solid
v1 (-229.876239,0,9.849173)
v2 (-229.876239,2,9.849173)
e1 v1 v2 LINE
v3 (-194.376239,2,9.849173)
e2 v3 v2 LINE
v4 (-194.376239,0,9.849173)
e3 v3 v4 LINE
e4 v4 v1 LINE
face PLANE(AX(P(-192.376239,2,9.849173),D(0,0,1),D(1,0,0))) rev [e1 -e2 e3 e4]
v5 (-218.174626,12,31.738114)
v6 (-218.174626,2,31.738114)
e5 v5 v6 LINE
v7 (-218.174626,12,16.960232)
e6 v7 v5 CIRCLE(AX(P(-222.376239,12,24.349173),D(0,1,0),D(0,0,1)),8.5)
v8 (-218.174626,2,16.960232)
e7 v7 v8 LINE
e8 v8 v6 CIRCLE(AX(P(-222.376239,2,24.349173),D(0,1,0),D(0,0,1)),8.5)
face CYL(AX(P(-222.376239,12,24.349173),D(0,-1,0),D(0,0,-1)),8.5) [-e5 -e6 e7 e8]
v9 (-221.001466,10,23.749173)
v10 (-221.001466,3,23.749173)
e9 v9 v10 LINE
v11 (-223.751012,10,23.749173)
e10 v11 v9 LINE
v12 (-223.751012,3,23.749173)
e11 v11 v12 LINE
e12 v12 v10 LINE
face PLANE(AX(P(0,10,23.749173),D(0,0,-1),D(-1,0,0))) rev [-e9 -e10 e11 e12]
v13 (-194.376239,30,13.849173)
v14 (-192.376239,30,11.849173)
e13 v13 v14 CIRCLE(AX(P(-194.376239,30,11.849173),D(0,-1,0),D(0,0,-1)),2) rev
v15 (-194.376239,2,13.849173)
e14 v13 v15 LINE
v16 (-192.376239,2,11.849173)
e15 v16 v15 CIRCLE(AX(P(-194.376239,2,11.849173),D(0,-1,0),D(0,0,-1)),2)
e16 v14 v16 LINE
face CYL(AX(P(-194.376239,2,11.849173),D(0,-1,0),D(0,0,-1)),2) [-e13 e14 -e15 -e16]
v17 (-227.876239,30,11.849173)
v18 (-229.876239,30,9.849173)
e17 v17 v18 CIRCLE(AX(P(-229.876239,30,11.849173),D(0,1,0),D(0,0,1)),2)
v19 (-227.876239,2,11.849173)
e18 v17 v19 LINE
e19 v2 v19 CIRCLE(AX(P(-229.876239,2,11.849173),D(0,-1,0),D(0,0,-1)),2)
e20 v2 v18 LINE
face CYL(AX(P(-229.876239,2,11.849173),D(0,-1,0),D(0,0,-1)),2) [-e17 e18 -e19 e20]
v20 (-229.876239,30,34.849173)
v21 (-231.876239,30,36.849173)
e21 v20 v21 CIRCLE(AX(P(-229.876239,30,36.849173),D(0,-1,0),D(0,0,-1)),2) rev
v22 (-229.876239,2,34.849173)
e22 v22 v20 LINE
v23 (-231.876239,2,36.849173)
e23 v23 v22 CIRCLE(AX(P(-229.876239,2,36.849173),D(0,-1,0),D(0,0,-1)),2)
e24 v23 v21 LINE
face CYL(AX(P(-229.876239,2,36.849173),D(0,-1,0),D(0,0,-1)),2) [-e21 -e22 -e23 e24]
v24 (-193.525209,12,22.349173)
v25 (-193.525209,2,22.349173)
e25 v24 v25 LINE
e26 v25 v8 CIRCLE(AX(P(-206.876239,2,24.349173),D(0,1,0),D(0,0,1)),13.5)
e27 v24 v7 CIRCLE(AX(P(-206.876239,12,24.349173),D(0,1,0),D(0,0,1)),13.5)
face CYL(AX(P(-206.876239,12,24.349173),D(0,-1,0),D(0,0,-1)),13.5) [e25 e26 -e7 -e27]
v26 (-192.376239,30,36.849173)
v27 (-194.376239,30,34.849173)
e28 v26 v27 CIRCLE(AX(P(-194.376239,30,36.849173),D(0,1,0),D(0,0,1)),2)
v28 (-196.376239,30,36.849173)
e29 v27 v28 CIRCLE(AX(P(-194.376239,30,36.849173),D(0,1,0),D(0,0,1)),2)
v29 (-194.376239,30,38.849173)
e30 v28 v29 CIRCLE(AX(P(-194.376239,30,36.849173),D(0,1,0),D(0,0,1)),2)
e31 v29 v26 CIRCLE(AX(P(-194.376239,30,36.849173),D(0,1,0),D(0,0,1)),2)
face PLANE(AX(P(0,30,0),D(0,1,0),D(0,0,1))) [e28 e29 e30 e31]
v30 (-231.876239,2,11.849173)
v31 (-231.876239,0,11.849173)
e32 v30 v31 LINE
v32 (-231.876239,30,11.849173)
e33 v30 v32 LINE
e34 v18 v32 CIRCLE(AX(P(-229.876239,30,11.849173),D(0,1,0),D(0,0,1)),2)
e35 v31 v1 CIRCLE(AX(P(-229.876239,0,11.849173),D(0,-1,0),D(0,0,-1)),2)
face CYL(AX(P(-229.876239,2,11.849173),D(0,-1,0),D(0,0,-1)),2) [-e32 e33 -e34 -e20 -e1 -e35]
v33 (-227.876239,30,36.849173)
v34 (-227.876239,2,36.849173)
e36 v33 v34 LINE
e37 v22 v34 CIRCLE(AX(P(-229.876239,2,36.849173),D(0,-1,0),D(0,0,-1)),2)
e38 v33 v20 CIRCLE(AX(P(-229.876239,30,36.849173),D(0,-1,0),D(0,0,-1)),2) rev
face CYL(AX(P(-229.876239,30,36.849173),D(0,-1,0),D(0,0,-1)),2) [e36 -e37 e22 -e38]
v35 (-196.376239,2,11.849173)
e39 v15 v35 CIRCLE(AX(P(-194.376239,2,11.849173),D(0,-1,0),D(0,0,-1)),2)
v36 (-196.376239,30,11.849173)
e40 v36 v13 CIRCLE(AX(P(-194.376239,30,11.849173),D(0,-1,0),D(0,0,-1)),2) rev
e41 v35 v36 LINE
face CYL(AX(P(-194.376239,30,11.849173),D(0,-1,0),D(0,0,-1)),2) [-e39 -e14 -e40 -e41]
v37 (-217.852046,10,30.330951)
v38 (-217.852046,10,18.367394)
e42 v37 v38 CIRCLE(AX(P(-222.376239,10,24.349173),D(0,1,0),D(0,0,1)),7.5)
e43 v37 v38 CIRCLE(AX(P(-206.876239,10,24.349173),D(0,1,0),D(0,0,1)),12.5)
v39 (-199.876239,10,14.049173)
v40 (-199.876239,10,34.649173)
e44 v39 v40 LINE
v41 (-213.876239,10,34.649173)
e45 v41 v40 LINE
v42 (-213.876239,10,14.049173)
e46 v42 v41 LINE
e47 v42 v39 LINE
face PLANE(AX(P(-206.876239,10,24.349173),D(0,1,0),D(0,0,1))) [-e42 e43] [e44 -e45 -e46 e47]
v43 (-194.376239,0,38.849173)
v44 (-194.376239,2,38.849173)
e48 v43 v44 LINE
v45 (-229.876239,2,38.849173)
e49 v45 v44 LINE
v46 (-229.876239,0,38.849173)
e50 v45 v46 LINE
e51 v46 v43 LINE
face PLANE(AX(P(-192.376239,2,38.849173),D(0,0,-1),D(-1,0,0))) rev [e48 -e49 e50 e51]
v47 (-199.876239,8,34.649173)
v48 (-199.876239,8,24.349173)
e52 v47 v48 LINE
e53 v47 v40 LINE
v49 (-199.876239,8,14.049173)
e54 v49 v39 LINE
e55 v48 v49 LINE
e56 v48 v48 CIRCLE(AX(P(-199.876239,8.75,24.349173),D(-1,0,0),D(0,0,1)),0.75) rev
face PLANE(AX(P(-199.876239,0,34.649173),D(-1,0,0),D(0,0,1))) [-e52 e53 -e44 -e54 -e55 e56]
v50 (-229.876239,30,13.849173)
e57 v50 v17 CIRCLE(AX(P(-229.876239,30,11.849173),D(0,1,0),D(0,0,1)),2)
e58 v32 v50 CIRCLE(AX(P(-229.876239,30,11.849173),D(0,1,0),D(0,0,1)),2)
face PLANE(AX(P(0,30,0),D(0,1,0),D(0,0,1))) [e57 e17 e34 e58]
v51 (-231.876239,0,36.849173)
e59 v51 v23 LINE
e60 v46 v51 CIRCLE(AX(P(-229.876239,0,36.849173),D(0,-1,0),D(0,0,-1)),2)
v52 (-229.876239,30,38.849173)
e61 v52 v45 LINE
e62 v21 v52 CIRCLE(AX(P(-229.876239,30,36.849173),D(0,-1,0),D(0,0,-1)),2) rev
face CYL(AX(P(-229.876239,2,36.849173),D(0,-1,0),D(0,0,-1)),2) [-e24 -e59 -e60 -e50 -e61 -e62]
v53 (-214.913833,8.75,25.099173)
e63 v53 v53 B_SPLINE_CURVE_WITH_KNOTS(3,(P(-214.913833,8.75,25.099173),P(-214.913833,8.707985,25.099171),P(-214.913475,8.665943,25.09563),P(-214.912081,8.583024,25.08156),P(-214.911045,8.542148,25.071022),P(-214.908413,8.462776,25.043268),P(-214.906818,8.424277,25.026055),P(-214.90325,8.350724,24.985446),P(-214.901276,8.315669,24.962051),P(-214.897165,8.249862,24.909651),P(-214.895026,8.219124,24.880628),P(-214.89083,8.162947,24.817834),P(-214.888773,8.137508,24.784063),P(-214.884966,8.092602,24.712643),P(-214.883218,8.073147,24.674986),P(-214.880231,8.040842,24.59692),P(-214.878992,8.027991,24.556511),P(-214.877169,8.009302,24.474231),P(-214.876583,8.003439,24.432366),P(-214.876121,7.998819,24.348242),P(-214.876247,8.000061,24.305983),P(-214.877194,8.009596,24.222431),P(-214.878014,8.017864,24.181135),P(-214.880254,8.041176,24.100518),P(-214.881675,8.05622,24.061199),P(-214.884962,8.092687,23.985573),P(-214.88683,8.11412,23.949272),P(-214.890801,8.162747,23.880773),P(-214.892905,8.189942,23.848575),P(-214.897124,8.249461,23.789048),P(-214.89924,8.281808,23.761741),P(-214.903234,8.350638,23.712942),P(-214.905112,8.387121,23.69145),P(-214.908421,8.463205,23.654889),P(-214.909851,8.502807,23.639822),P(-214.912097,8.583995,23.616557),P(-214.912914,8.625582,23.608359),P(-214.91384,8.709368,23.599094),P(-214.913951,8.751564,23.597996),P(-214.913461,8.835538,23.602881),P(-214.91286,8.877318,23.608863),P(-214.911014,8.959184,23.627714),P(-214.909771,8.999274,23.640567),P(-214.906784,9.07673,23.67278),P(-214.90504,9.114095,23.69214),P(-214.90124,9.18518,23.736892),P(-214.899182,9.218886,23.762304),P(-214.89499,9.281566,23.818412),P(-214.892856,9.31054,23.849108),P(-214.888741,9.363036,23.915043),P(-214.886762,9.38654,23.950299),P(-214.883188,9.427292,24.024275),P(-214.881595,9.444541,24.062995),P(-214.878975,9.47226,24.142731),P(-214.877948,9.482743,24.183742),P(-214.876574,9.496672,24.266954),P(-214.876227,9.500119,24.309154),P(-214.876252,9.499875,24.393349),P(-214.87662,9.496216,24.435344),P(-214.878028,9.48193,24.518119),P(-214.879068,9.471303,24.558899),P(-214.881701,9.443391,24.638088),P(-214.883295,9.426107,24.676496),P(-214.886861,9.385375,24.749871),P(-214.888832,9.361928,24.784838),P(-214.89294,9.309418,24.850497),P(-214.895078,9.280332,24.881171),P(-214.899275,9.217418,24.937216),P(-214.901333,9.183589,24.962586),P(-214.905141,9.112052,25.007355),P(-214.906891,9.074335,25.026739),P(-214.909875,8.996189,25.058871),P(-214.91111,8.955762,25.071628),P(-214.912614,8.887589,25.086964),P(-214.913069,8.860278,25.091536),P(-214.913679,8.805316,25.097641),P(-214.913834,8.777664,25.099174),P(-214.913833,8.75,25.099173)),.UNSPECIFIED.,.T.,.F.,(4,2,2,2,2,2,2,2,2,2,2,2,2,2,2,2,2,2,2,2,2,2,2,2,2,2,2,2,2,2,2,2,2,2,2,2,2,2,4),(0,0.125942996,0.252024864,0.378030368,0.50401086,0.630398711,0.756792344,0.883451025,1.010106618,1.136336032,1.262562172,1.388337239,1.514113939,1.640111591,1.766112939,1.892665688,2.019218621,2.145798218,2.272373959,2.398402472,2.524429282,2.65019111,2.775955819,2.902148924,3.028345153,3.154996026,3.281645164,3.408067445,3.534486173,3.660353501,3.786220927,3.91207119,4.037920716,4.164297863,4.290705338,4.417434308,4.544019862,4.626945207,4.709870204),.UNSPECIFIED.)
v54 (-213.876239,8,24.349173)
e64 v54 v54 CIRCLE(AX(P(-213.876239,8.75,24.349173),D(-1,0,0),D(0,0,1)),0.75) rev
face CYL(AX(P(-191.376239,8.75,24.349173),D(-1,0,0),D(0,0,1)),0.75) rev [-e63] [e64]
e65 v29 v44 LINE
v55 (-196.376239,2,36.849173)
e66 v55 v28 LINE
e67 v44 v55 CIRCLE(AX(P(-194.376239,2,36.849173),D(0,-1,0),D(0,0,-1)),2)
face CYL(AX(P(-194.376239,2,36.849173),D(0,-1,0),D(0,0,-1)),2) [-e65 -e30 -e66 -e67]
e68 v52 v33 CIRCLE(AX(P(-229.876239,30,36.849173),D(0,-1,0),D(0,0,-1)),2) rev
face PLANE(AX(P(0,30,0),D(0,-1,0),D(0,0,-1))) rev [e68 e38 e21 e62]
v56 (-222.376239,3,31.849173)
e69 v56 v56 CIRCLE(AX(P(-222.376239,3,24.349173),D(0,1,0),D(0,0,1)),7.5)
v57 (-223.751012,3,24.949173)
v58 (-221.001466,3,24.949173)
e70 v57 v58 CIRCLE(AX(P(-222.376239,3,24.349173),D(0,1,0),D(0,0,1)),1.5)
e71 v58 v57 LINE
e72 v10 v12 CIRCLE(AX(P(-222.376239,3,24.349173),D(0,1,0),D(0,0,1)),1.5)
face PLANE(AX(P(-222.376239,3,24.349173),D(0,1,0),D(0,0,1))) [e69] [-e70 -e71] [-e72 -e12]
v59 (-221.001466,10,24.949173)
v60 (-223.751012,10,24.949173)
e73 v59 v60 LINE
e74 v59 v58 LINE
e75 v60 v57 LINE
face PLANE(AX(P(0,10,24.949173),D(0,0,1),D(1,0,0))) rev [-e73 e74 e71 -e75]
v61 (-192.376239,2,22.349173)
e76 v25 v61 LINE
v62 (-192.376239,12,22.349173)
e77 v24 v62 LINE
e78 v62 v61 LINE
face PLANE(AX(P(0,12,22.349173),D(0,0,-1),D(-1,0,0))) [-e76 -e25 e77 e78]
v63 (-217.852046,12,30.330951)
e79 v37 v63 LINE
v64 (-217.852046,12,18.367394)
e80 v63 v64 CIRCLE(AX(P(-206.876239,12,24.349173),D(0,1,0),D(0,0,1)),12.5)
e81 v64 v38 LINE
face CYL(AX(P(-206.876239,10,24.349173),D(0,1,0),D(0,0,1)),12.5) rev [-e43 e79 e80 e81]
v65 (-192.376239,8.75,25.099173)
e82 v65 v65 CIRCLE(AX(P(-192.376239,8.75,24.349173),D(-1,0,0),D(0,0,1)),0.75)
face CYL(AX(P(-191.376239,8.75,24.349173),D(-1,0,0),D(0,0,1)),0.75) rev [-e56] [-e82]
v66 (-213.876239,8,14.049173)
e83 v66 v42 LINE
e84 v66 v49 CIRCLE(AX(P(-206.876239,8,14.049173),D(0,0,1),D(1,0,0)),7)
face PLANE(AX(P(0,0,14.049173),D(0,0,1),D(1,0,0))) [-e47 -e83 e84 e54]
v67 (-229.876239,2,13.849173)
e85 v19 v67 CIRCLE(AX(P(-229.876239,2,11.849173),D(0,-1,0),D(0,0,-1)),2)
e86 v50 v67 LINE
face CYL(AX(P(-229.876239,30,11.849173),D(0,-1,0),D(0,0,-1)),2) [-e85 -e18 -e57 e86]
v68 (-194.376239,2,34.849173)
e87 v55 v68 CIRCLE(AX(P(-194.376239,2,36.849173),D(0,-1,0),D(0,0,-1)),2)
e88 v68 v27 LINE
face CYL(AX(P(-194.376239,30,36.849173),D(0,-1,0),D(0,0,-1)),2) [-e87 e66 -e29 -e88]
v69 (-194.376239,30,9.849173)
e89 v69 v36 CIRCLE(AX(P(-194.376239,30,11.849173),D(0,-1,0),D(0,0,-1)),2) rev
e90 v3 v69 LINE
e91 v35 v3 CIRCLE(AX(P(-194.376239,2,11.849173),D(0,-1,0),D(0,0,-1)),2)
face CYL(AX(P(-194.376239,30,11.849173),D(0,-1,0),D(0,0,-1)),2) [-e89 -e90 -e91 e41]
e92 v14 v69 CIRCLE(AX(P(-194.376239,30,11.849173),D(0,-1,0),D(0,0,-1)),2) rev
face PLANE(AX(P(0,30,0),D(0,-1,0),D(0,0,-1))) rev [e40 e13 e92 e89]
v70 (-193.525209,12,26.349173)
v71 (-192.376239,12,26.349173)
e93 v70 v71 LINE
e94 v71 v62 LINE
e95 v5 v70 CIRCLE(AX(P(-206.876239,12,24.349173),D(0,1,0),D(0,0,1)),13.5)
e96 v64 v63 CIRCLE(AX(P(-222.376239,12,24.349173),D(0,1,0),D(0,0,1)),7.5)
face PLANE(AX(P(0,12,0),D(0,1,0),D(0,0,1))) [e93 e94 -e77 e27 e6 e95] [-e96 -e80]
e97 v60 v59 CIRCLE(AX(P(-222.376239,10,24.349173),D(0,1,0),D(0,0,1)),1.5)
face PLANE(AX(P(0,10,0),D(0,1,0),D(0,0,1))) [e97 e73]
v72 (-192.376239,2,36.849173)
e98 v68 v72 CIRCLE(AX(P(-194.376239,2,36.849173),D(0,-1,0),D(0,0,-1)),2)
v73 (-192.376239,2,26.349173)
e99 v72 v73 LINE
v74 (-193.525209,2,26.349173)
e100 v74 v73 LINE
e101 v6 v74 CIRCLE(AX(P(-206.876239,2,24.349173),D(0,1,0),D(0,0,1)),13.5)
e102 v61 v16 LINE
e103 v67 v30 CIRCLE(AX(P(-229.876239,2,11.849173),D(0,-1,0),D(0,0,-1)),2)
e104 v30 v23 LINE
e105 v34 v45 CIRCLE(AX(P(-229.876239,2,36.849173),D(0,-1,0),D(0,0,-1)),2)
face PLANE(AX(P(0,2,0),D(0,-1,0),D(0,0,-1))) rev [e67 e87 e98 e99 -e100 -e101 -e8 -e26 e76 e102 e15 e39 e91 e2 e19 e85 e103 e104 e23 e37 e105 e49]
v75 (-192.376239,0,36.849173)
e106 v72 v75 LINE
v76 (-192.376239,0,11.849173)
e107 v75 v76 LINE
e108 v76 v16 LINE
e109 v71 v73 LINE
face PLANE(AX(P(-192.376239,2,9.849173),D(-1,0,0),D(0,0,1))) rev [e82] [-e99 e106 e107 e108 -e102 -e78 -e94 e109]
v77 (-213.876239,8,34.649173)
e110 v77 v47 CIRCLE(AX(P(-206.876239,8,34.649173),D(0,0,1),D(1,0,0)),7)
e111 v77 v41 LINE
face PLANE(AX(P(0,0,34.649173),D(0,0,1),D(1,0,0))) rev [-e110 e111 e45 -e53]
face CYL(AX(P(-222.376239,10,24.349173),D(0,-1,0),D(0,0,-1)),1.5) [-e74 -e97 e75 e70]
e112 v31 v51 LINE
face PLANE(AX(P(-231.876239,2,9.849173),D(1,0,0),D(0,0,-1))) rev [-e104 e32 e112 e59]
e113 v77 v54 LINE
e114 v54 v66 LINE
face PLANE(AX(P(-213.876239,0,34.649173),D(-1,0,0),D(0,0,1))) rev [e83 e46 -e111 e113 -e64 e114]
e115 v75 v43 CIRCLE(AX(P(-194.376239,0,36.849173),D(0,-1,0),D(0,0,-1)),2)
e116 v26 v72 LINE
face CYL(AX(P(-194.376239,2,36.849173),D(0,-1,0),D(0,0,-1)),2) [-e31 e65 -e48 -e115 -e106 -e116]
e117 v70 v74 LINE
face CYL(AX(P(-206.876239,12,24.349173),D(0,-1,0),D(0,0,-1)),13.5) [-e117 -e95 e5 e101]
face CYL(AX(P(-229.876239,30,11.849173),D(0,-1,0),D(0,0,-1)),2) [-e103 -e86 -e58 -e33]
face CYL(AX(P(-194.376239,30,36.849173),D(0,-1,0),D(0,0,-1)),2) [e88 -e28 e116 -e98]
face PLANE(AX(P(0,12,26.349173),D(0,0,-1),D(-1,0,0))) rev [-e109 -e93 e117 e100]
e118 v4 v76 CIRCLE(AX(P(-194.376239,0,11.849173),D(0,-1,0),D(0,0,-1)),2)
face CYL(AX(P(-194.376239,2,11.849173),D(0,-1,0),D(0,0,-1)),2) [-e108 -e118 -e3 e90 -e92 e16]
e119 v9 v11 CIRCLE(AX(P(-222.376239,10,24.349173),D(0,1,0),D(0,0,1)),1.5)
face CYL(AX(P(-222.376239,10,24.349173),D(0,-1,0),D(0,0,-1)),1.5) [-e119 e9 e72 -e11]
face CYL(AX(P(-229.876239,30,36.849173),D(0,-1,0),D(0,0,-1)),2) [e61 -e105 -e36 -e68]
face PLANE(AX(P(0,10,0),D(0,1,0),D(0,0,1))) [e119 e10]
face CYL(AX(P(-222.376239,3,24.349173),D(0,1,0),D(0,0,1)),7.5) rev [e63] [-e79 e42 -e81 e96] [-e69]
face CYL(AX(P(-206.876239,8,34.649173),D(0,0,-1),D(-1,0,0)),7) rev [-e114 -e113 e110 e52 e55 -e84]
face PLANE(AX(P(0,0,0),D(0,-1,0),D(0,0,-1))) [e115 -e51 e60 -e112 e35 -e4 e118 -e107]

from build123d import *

# Parameters (mm, degrees)
SKETCH1_W            = 39.5
SKETCH1_H            = 29
BOSS_EXTRUDE1_DEPTH  = 2
SKETCH2_R            = 13.5
SKETCH2_R_2          = 8.5
BOSS_EXTRUDE2_DEPTH  = 10
SKETCH3_R            = 12.5
CUT_EXTRUDE1_DEPTH   = 2
SKETCH4_R            = 7.5
CUT_EXTRUDE2_DEPTH   = 9
CUT_EXTRUDE3_START   = -10.3
CUT_EXTRUDE3_DEPTH   = 20.6
BOSS_EXTRUDE3_DEPTH  = 10
CUT_SWEEP1_START     = -214.913833497
CUT_SWEEP1_OUTLINE_R = 0.75
CUT_SWEEP1_DEPTH     = 22.537594322
BOSS_EXTRUDE4_DEPTH  = 7
SKETCH11_W           = 4
SKETCH11_H           = 4
BOSS_EXTRUDE5_DEPTH  = 28
FILLET1_R            = 2


# Read off the part's stored shape, not the designer's step: Cut-Extrude3, Cut-Sweep1
with BuildPart() as part:
    # Sketch1 → Boss-Extrude1 (new body)
    with BuildSketch(Plane(origin=(0, 0, 0), x_dir=(1, 0, 0), z_dir=(0, 1, 0))):
        with Locations((-212.126239175, -24.349172792)):
            Rectangle(SKETCH1_W, SKETCH1_H)
    extrude(amount=BOSS_EXTRUDE1_DEPTH)

    # Sketch2 → Boss-Extrude2 (add)
    with BuildSketch(Plane(origin=(0, 2, 0), x_dir=(1, 0, 0), z_dir=(0, 1, 0))):
        with Locations((-206.876239175, -24.349172792)):
            Circle(SKETCH2_R)
        with Locations((-222.376239175, -24.349172792)):
            Circle(SKETCH2_R_2)
    extrude(amount=BOSS_EXTRUDE2_DEPTH)

    # Sketch3 → Cut-Extrude1 (cut)
    with BuildSketch(Plane(origin=(0, 12, 0), x_dir=(1, 0, 0), z_dir=(0, 1, 0))):
        with Locations(Location((-206.876239175, -24.349172792, 0), (0, 0, 270))):
            Circle(SKETCH3_R)
    extrude(amount=-CUT_EXTRUDE1_DEPTH, mode=Mode.SUBTRACT)

    # Sketch4 → Cut-Extrude2 (cut)
    with BuildSketch(Plane(origin=(0, 12, 0), x_dir=(1, 0, 0), z_dir=(0, 1, 0))):
        with Locations(Location((-222.376239175, -24.349172792, 0), (0, 0, 270))):
            Circle(SKETCH4_R)
    extrude(amount=-CUT_EXTRUDE2_DEPTH, mode=Mode.SUBTRACT)

    # Cut-Extrude3 outline → Cut-Extrude3 (cut)
    with BuildSketch(Plane.XY.offset(24.349172792).offset(CUT_EXTRUDE3_START)):
        with BuildLine():
            ThreePointArc((-213.876239175, 8), (-206.876239175, 1), (-199.876239175, 8))
            Line((-199.876239175, 8), (-199.876239175, 10))
            Line((-199.876239175, 10), (-213.876239175, 10))
            Line((-213.876239175, 10), (-213.876239175, 8))
        make_face()
    extrude(amount=CUT_EXTRUDE3_DEPTH, mode=Mode.SUBTRACT)

    # Sketch7 → Boss-Extrude3 (add)
    with BuildSketch(Plane(origin=(0, 2, 0), x_dir=(1, 0, 0), z_dir=(0, 1, 0))):
        with BuildLine():
            Line((-192.376239175, -26.349172792), (-192.376239175, -24.349172792))
            Line((-192.376239175, -24.349172792), (-192.376239175, -22.349172792))
            Line((-192.376239175, -22.349172792), (-193.525209252, -22.349172792))
            ThreePointArc((-193.525209252, -22.349172792), (-193.413533207, -23.346402619), (-193.376239175, -24.349172792))
            ThreePointArc((-193.376239175, -24.349172792), (-193.413533207, -25.351942966), (-193.525209252, -26.349172792))
            Line((-193.525209252, -26.349172792), (-192.376239175, -26.349172792))
        make_face()
    extrude(amount=BOSS_EXTRUDE3_DEPTH)

    # Cut-Sweep1 outline → Cut-Sweep1 (cut)
    with BuildSketch(Plane.YZ.offset(CUT_SWEEP1_START)):
        with Locations((8.75, 24.349172792)):
            Circle(CUT_SWEEP1_OUTLINE_R)
    extrude(amount=CUT_SWEEP1_DEPTH, mode=Mode.SUBTRACT)

    # Sketch10 → Boss-Extrude4 (add)
    with BuildSketch(Plane(origin=(0, 3, 0), x_dir=(1, 0, 0), z_dir=(0, 1, 0))):
        with BuildLine():
            Line((-223.751011884, -23.749172792), (-222.376239175, -23.749172792))
            Line((-222.376239175, -23.749172792), (-221.001466467, -23.749172792))
            ThreePointArc((-221.001466467, -23.749172792), (-222.376239175, -22.849172792), (-223.751011884, -23.749172792))
        make_face()
        with BuildLine():
            Line((-221.001466467, -24.949172792), (-223.751011884, -24.949172792))
            ThreePointArc((-223.751011884, -24.949172792), (-222.376239175, -25.849172792), (-221.001466467, -24.949172792))
        make_face()
    extrude(amount=BOSS_EXTRUDE4_DEPTH)

    # Sketch11 → Boss-Extrude5 (add)
    with BuildSketch(Plane(origin=(0, 2, 0), x_dir=(1, 0, 0), z_dir=(0, 1, 0))):
        with Locations((-229.876239175, -36.849172792)):
            Rectangle(SKETCH11_W, SKETCH11_H)
        with Locations((-229.876239175, -11.849172792)):
            Rectangle(SKETCH11_W, SKETCH11_H)
        with Locations((-194.376239175, -36.849172792)):
            Rectangle(SKETCH11_W, SKETCH11_H)
        with Locations((-194.376239175, -11.849172792)):
            Rectangle(SKETCH11_W, SKETCH11_H)
    extrude(amount=BOSS_EXTRUDE5_DEPTH)

    # Fillet1
    fillet1_edges = [part.edges().sort_by_distance(p)[0] for p in [
        (-192.376239175, 16, 34.849172792),
        (-192.376239175, 15, 9.849172792),
        (-227.876239175, 16, 9.849172792),
        (-227.876239175, 16, 34.849172792),
        (-192.376239175, 16, 13.849172792),
        (-196.376239175, 16, 13.849172792),
        (-196.376239175, 16, 9.849172792),
        (-192.376239175, 15, 38.849172792),
        (-196.376239175, 16, 38.849172792),
        (-196.376239175, 16, 34.849172792),
        (-227.876239175, 16, 38.849172792),
        (-231.876239175, 15, 38.849172792),
        (-231.876239175, 16, 34.849172792),
        (-227.876239175, 16, 13.849172792),
        (-231.876239175, 16, 13.849172792),
        (-231.876239175, 15, 9.849172792),
    ]]
    fillet(fillet1_edges, radius=FILLET1_R - 0.0001)  # a hair under: the kernel refuses the full size


solid = part.part
